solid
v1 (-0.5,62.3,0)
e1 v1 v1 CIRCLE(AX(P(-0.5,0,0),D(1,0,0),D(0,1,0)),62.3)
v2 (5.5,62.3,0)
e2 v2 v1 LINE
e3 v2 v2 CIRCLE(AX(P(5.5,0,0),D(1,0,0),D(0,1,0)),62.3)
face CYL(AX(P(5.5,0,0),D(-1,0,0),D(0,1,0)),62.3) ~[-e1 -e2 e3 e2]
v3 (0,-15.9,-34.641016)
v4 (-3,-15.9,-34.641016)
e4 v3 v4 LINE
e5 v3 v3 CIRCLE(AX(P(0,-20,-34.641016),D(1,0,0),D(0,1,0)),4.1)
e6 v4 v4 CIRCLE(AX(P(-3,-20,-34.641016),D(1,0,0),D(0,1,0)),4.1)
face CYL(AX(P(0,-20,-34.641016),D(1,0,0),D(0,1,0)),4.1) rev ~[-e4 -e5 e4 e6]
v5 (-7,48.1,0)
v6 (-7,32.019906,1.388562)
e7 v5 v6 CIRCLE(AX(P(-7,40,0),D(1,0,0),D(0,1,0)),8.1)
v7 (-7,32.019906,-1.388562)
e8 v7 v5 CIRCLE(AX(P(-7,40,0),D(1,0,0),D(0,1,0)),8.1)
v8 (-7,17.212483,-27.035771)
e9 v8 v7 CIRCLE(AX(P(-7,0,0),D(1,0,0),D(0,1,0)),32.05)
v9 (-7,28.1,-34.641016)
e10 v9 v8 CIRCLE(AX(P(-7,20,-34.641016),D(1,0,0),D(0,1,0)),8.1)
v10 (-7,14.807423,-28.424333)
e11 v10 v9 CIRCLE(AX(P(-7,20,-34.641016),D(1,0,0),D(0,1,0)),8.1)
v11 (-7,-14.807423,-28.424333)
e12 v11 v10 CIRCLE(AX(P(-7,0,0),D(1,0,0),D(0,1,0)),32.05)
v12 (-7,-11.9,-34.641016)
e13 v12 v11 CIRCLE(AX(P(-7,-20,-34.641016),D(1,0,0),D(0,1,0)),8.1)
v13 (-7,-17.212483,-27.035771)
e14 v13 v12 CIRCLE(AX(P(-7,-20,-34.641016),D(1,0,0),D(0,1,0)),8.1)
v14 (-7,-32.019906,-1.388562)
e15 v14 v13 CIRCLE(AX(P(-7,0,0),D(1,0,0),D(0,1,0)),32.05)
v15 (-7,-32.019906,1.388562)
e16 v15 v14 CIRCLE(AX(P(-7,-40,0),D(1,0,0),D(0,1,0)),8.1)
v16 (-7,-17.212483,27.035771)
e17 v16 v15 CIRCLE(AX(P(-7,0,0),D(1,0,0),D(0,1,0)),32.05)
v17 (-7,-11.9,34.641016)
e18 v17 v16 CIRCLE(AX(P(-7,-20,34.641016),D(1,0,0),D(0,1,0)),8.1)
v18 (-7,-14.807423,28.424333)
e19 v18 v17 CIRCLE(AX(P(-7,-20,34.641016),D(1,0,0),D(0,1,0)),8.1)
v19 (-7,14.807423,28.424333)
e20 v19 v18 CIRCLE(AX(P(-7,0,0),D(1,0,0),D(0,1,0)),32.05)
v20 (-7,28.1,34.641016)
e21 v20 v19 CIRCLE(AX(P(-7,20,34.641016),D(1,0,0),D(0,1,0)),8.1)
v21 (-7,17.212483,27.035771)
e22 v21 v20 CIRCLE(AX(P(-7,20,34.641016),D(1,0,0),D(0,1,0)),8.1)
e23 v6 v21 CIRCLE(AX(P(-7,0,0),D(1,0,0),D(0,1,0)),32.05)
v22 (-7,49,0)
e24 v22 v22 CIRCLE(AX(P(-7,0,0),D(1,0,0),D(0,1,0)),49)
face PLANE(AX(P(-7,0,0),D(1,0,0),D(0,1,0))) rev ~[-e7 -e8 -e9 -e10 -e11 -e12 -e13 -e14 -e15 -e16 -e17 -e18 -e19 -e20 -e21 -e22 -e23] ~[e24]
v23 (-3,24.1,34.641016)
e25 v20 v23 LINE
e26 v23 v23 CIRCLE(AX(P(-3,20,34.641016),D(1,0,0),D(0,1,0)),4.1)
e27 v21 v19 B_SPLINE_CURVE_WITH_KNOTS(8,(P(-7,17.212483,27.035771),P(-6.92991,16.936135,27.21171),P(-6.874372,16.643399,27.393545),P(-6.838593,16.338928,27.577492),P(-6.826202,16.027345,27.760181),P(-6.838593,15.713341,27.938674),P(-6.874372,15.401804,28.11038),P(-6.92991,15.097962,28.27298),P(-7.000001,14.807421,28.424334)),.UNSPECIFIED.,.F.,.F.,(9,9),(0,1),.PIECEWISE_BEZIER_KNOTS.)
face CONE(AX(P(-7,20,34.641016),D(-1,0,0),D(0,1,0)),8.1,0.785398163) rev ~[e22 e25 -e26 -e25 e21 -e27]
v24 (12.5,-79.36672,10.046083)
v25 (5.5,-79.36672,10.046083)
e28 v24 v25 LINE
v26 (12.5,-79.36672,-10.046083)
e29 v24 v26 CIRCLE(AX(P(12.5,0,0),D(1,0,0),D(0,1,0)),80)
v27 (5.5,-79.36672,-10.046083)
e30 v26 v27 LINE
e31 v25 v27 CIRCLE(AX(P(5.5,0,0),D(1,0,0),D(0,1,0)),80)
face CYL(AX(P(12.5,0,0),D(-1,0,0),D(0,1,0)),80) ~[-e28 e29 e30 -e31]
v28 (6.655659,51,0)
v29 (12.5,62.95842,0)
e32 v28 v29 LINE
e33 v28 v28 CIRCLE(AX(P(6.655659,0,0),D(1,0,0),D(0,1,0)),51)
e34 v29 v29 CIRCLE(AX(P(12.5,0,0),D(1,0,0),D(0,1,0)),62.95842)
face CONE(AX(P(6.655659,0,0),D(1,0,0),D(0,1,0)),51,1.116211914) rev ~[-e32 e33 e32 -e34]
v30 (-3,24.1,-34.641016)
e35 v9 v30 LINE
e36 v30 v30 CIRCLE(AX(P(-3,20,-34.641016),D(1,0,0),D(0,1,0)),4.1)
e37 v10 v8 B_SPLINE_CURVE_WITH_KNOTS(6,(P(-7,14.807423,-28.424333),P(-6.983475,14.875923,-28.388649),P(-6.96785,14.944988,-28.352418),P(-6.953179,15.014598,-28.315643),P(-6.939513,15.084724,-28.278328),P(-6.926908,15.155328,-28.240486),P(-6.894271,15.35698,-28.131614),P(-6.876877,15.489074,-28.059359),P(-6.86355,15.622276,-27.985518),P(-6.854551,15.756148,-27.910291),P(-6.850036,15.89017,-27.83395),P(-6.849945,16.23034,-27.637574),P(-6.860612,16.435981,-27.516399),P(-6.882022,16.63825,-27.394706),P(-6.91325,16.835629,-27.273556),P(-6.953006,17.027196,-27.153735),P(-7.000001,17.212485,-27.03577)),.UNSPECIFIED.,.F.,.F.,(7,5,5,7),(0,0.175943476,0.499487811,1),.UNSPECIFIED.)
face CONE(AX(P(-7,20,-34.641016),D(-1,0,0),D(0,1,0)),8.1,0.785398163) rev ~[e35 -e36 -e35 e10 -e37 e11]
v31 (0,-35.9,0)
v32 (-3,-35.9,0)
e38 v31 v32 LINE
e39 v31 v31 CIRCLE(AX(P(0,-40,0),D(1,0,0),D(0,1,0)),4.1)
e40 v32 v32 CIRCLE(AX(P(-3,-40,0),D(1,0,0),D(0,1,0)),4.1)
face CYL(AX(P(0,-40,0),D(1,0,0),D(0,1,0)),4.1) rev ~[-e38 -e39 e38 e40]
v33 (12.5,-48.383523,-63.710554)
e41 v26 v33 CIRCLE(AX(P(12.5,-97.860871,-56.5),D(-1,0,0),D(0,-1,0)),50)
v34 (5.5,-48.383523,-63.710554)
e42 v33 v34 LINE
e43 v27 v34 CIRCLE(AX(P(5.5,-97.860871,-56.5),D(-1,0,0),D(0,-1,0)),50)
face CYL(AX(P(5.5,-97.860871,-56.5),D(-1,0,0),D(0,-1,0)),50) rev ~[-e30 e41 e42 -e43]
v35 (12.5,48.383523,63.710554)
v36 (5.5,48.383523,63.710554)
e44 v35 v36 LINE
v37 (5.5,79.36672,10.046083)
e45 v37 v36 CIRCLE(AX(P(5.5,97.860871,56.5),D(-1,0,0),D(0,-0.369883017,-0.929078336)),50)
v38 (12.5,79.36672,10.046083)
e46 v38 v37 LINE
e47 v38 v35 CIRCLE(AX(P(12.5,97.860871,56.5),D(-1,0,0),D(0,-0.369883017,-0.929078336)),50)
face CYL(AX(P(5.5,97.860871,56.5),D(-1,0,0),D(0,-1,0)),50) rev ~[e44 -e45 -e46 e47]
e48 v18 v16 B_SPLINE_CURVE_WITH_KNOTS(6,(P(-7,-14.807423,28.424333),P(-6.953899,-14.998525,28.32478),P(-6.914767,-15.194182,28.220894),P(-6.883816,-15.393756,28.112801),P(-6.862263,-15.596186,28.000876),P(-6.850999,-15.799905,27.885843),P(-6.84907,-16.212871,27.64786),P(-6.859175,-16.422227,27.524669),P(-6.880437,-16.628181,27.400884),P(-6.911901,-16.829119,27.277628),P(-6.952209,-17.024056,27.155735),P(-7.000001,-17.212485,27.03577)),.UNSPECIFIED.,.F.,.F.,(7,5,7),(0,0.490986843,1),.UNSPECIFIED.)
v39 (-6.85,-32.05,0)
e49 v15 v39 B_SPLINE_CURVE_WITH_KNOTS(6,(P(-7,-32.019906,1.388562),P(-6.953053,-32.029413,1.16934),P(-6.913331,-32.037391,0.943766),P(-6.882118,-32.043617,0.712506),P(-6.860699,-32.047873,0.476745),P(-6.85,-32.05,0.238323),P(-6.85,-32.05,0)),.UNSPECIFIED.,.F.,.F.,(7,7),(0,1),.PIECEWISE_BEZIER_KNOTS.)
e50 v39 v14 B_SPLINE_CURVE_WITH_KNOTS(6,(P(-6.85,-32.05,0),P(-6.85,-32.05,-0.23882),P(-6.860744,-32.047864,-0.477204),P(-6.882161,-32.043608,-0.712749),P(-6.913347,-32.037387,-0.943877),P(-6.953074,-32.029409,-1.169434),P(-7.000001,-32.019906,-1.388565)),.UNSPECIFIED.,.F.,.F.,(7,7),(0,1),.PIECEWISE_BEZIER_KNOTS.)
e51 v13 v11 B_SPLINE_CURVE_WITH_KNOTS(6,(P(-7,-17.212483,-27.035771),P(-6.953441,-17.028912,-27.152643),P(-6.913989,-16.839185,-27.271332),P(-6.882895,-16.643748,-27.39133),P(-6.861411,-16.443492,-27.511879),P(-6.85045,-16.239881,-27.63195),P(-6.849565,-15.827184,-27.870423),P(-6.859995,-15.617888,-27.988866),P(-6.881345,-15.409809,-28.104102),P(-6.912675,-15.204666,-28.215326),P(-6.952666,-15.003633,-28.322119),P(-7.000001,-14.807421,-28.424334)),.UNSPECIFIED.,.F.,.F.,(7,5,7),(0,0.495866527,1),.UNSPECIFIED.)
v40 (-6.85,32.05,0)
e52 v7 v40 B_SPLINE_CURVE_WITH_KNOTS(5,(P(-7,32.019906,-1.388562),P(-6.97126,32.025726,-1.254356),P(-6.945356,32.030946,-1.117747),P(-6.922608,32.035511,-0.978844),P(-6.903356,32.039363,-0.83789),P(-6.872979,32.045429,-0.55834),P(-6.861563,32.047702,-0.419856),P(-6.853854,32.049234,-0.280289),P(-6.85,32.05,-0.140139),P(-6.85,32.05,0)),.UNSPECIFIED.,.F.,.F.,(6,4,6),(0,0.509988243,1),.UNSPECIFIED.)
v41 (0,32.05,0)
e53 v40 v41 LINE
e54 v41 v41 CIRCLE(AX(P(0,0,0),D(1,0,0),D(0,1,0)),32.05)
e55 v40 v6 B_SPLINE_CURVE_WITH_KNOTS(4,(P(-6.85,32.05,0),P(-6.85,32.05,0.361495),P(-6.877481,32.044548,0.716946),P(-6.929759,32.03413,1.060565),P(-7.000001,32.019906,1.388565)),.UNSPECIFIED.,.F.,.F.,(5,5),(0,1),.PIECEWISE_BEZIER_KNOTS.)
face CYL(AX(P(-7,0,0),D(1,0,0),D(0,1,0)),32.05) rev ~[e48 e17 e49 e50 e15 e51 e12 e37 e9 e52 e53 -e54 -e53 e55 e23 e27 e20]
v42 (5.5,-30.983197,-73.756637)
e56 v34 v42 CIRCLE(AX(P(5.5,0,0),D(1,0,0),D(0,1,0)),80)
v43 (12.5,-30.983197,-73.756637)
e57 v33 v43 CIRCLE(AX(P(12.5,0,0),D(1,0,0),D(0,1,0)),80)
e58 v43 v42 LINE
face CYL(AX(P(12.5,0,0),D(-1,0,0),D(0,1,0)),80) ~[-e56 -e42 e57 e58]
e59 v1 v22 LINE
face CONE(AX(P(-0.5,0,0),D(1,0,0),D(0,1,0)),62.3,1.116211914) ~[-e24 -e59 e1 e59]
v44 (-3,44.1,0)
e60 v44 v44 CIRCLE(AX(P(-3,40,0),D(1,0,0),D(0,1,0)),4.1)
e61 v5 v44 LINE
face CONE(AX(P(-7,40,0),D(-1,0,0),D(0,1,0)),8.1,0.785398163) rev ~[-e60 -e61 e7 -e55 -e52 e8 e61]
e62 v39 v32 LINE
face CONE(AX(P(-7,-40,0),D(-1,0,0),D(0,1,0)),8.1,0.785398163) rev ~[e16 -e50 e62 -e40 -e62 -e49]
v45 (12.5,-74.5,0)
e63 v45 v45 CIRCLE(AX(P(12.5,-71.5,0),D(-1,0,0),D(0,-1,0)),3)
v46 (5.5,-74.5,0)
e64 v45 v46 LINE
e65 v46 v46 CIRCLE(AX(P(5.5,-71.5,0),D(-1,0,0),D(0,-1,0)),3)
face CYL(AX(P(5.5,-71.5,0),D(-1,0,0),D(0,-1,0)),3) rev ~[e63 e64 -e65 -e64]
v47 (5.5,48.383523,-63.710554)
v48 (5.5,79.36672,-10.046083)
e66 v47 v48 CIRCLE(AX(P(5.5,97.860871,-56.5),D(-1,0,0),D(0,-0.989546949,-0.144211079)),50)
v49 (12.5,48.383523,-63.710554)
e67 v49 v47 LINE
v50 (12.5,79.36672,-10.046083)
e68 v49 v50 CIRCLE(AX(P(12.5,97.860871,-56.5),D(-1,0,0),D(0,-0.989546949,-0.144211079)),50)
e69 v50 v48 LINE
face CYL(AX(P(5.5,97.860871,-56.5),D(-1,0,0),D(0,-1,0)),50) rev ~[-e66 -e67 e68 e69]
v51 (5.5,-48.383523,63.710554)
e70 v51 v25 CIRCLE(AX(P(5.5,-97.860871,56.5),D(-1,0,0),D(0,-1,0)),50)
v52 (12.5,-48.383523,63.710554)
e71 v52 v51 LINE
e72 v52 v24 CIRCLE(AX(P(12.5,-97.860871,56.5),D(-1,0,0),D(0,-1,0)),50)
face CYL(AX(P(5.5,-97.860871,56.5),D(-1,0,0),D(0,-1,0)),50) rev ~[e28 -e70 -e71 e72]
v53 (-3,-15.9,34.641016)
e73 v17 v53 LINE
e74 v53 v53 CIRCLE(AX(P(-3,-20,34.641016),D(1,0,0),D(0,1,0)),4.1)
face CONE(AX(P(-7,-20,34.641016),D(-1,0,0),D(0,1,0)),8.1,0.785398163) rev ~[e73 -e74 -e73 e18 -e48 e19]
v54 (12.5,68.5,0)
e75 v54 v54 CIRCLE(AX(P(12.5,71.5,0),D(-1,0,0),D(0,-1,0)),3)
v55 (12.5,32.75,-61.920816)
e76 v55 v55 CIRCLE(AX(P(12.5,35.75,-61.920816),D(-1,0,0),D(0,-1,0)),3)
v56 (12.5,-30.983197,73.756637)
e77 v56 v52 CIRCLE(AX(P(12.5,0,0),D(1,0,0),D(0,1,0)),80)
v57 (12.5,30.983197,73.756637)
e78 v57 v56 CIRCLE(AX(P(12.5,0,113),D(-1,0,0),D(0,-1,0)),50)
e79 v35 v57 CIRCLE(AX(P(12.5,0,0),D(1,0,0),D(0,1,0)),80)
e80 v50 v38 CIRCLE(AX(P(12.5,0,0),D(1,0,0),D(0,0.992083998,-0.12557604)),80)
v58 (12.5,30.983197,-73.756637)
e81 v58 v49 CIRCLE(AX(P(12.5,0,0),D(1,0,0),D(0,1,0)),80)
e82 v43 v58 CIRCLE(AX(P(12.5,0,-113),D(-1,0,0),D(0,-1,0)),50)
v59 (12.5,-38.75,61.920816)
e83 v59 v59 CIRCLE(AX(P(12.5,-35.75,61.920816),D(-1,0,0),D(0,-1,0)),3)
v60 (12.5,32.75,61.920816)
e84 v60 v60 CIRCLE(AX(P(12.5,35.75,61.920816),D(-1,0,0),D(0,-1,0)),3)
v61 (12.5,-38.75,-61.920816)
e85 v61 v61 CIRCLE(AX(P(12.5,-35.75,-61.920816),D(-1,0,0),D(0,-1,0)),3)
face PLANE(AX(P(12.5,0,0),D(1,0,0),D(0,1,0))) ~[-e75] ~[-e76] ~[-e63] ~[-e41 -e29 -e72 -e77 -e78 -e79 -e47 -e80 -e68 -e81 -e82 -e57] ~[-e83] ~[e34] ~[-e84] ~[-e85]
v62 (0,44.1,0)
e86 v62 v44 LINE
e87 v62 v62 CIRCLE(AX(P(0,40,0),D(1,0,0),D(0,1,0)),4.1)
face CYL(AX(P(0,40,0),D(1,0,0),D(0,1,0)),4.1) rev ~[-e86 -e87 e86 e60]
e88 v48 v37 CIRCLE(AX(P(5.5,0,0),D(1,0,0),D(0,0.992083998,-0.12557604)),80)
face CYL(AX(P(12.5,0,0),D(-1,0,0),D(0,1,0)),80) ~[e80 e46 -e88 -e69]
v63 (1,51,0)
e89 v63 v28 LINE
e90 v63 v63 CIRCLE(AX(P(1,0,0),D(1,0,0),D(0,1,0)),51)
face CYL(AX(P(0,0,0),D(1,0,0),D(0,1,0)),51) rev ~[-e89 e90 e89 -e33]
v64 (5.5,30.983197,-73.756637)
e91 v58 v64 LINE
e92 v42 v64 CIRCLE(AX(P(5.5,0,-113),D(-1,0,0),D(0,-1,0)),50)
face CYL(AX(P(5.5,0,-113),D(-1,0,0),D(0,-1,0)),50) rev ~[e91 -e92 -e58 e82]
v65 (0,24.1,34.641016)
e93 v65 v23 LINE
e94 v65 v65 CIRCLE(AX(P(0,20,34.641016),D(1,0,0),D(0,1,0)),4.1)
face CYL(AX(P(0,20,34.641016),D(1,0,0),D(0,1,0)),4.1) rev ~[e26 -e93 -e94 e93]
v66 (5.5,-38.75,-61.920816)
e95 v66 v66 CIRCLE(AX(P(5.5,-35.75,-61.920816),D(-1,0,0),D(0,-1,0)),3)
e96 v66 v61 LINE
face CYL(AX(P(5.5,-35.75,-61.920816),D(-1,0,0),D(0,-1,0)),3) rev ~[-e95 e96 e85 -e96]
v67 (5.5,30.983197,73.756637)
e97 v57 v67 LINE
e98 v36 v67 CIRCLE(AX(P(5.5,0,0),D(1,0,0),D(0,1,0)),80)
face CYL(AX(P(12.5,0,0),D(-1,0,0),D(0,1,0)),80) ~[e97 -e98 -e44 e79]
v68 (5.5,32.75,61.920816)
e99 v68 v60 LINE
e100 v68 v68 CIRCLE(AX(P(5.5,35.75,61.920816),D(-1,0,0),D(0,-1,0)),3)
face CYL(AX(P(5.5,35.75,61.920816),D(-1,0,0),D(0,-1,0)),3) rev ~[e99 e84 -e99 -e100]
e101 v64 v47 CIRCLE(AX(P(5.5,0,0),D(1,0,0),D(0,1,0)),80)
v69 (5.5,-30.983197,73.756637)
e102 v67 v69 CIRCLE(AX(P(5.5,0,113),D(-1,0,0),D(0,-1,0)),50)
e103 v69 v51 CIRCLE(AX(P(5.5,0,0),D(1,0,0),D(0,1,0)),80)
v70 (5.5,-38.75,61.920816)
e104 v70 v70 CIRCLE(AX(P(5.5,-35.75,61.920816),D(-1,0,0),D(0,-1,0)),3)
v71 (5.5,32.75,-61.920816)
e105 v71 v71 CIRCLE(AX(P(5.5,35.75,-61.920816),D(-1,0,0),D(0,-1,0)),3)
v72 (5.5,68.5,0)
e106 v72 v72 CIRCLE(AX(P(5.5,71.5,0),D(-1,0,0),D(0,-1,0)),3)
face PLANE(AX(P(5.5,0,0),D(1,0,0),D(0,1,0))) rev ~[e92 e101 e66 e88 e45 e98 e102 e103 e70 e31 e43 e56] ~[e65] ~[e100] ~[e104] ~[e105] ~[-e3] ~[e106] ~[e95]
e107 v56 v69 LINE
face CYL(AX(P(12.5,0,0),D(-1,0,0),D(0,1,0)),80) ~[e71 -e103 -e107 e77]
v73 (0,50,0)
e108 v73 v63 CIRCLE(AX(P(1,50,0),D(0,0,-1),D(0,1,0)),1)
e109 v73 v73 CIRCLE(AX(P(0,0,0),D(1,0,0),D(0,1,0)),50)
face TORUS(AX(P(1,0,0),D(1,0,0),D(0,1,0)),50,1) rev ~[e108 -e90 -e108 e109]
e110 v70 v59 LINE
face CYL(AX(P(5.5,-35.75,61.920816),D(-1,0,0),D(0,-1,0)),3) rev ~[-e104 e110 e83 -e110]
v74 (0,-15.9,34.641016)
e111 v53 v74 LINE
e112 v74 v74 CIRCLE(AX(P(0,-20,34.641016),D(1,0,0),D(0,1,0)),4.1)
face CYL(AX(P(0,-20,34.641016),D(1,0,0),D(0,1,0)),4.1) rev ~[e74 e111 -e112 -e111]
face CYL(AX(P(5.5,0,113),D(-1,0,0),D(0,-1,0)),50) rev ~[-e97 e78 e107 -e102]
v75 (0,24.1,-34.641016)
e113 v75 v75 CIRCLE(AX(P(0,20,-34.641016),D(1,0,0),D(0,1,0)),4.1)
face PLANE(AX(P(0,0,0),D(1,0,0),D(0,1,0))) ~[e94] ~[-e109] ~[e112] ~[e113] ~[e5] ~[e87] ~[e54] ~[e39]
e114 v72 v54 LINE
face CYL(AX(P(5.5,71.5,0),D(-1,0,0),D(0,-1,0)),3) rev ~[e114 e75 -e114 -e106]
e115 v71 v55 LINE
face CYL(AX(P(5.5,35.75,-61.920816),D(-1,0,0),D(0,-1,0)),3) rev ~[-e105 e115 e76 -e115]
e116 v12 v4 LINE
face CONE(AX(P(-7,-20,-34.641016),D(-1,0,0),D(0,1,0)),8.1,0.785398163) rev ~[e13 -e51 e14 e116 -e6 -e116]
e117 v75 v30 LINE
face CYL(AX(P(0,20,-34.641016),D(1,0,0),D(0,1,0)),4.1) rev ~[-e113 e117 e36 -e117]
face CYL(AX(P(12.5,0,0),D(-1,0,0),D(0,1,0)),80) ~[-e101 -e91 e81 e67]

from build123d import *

# Parameters (mm, degrees)
F2_R     = 4.1
F3_DEPTH = 50
F4_R     = 3
F5_DEPTH = 50
F7_R     = 1
F8_R     = 50
F9_DEPTH = 50


# Not quite as in the source:
# - a fillet or chamfer that OpenCascade refuses, or shapes differently, is made with other operations: its cross-section is extruded or revolved along the edge and cut away or added
# - a feature names something its author has since deleted; it is built from what else it names


with BuildPart() as f1:
    # F0 (on Top) → F1 (revolve)
    with BuildSketch(Plane.XY):
        Polygon((-7, 49), (-7, 32.05), (0, 32.05), (0, 51), (6.6556592449, 51), (12.5, 62.9584203143), (12.5, 80), (5.5, 80), (5.5, 62.3), (-0.5, 62.3), align=None)
    revolve(axis=Axis((-3.5, 0, 0), (1, 0, 0)))

    # F2 (on Right) → F3 (cut, symmetric)
    with BuildSketch(Plane.YZ):
        with Locations((-40, 0)):
            Circle(F2_R)
        with Locations((-20, -34.6410161514)):
            Circle(F2_R)
        with Locations((20, -34.6410161514)):
            Circle(F2_R)
        with Locations((40, 0)):
            Circle(F2_R)
        with Locations((20, 34.6410161514)):
            Circle(F2_R)
        with Locations((-20, 34.6410161514)):
            Circle(F2_R)
    extrude(amount=F3_DEPTH, both=True, mode=Mode.SUBTRACT)

    # F4 (on face) → F5 (cut, symmetric)
    with BuildSketch(Plane(origin=(5.5, 0, 0), x_dir=(0, -1, 0), z_dir=(-1, 0, 0))):
        with Locations((35.75, 61.9208163706)):
            Circle(F4_R)
        with Locations((-35.75, 61.9208163706)):
            Circle(F4_R)
        with Locations((-71.5, 0)):
            Circle(F4_R)
        with Locations((-35.75, -61.9208163706)):
            Circle(F4_R)
        with Locations((35.75, -61.9208163706)):
            Circle(F4_R)
        with Locations((71.5, 0)):
            Circle(F4_R)
    extrude(amount=F5_DEPTH, both=True, mode=Mode.SUBTRACT)

    # F6: chamfer of 4 on 6 edges, made by hand

    # F6_s1 → F6_t2 (revolve, cut)
    with BuildSketch(Plane.XY.offset(34.6410161514)):
        Polygon((-7, 28.1), (-3, 24.1), (-7, 24.1), align=None)
    revolve(axis=Axis((-7, 20, 34.6410161514), (1, 0, 0)), mode=Mode.SUBTRACT)

    # F6_s3 → F6_t4 (revolve, cut)
    with BuildSketch(Plane.XY.offset(34.6410161514)):
        Polygon((-7, -11.9), (-3, -15.9), (-7, -15.9), align=None)
    revolve(axis=Axis((-7, -20, 34.6410161514), (1, 0, 0)), mode=Mode.SUBTRACT)

    # F6_s5 → F6_t6 (revolve, cut)
    with BuildSketch(Plane.XY):
        Polygon((-7, -31.9), (-3, -35.9), (-7, -35.9), align=None)
    revolve(axis=Axis((-7, -40, 0), (1, 0, 0)), mode=Mode.SUBTRACT)

    # F6_s7 → F6_t8 (revolve, cut)
    with BuildSketch(Plane.XY.offset(-34.6410161514)):
        Polygon((-7, -11.9), (-3, -15.9), (-7, -15.9), align=None)
    revolve(axis=Axis((-7, -20, -34.6410161514), (1, 0, 0)), mode=Mode.SUBTRACT)

    # F6_s9 → F6_t10 (revolve, cut)
    with BuildSketch(Plane.XY.offset(-34.6410161514)):
        Polygon((-7, 28.1), (-3, 24.1), (-7, 24.1), align=None)
    revolve(axis=Axis((-7, 20, -34.6410161514), (1, 0, 0)), mode=Mode.SUBTRACT)

    # F6_s11 → F6_t12 (revolve, cut)
    with BuildSketch(Plane.XY):
        Polygon((-7, 48.1), (-3, 44.1), (-7, 44.1), align=None)
    revolve(axis=Axis((-7, 40, 0), (1, 0, 0)), mode=Mode.SUBTRACT)

    # F7
    f7_edges = [f1.edges().sort_by_distance(p)[0] for p in [
        (0, -51, 0),
    ]]
    fillet(f7_edges, radius=F7_R)

    # F8 (on face) → F9 (cut, symmetric)
    with BuildSketch(Plane(origin=(5.5, 0, 0), x_dir=(0, -1, 0), z_dir=(-1, 0, 0))):
        with Locations((0, 113)):
            Circle(F8_R)
        with Locations((-97.8608706276, 56.5)):
            Circle(F8_R)
        with Locations((-97.8608706276, -56.5)):
            Circle(F8_R)
        with Locations((0, -113)):
            Circle(F8_R)
        with Locations((97.8608706276, -56.5)):
            Circle(F8_R)
        with Locations((97.8608706276, 56.5)):
            Circle(F8_R)
    extrude(amount=F9_DEPTH, both=True, mode=Mode.SUBTRACT)


solid = f1.part
